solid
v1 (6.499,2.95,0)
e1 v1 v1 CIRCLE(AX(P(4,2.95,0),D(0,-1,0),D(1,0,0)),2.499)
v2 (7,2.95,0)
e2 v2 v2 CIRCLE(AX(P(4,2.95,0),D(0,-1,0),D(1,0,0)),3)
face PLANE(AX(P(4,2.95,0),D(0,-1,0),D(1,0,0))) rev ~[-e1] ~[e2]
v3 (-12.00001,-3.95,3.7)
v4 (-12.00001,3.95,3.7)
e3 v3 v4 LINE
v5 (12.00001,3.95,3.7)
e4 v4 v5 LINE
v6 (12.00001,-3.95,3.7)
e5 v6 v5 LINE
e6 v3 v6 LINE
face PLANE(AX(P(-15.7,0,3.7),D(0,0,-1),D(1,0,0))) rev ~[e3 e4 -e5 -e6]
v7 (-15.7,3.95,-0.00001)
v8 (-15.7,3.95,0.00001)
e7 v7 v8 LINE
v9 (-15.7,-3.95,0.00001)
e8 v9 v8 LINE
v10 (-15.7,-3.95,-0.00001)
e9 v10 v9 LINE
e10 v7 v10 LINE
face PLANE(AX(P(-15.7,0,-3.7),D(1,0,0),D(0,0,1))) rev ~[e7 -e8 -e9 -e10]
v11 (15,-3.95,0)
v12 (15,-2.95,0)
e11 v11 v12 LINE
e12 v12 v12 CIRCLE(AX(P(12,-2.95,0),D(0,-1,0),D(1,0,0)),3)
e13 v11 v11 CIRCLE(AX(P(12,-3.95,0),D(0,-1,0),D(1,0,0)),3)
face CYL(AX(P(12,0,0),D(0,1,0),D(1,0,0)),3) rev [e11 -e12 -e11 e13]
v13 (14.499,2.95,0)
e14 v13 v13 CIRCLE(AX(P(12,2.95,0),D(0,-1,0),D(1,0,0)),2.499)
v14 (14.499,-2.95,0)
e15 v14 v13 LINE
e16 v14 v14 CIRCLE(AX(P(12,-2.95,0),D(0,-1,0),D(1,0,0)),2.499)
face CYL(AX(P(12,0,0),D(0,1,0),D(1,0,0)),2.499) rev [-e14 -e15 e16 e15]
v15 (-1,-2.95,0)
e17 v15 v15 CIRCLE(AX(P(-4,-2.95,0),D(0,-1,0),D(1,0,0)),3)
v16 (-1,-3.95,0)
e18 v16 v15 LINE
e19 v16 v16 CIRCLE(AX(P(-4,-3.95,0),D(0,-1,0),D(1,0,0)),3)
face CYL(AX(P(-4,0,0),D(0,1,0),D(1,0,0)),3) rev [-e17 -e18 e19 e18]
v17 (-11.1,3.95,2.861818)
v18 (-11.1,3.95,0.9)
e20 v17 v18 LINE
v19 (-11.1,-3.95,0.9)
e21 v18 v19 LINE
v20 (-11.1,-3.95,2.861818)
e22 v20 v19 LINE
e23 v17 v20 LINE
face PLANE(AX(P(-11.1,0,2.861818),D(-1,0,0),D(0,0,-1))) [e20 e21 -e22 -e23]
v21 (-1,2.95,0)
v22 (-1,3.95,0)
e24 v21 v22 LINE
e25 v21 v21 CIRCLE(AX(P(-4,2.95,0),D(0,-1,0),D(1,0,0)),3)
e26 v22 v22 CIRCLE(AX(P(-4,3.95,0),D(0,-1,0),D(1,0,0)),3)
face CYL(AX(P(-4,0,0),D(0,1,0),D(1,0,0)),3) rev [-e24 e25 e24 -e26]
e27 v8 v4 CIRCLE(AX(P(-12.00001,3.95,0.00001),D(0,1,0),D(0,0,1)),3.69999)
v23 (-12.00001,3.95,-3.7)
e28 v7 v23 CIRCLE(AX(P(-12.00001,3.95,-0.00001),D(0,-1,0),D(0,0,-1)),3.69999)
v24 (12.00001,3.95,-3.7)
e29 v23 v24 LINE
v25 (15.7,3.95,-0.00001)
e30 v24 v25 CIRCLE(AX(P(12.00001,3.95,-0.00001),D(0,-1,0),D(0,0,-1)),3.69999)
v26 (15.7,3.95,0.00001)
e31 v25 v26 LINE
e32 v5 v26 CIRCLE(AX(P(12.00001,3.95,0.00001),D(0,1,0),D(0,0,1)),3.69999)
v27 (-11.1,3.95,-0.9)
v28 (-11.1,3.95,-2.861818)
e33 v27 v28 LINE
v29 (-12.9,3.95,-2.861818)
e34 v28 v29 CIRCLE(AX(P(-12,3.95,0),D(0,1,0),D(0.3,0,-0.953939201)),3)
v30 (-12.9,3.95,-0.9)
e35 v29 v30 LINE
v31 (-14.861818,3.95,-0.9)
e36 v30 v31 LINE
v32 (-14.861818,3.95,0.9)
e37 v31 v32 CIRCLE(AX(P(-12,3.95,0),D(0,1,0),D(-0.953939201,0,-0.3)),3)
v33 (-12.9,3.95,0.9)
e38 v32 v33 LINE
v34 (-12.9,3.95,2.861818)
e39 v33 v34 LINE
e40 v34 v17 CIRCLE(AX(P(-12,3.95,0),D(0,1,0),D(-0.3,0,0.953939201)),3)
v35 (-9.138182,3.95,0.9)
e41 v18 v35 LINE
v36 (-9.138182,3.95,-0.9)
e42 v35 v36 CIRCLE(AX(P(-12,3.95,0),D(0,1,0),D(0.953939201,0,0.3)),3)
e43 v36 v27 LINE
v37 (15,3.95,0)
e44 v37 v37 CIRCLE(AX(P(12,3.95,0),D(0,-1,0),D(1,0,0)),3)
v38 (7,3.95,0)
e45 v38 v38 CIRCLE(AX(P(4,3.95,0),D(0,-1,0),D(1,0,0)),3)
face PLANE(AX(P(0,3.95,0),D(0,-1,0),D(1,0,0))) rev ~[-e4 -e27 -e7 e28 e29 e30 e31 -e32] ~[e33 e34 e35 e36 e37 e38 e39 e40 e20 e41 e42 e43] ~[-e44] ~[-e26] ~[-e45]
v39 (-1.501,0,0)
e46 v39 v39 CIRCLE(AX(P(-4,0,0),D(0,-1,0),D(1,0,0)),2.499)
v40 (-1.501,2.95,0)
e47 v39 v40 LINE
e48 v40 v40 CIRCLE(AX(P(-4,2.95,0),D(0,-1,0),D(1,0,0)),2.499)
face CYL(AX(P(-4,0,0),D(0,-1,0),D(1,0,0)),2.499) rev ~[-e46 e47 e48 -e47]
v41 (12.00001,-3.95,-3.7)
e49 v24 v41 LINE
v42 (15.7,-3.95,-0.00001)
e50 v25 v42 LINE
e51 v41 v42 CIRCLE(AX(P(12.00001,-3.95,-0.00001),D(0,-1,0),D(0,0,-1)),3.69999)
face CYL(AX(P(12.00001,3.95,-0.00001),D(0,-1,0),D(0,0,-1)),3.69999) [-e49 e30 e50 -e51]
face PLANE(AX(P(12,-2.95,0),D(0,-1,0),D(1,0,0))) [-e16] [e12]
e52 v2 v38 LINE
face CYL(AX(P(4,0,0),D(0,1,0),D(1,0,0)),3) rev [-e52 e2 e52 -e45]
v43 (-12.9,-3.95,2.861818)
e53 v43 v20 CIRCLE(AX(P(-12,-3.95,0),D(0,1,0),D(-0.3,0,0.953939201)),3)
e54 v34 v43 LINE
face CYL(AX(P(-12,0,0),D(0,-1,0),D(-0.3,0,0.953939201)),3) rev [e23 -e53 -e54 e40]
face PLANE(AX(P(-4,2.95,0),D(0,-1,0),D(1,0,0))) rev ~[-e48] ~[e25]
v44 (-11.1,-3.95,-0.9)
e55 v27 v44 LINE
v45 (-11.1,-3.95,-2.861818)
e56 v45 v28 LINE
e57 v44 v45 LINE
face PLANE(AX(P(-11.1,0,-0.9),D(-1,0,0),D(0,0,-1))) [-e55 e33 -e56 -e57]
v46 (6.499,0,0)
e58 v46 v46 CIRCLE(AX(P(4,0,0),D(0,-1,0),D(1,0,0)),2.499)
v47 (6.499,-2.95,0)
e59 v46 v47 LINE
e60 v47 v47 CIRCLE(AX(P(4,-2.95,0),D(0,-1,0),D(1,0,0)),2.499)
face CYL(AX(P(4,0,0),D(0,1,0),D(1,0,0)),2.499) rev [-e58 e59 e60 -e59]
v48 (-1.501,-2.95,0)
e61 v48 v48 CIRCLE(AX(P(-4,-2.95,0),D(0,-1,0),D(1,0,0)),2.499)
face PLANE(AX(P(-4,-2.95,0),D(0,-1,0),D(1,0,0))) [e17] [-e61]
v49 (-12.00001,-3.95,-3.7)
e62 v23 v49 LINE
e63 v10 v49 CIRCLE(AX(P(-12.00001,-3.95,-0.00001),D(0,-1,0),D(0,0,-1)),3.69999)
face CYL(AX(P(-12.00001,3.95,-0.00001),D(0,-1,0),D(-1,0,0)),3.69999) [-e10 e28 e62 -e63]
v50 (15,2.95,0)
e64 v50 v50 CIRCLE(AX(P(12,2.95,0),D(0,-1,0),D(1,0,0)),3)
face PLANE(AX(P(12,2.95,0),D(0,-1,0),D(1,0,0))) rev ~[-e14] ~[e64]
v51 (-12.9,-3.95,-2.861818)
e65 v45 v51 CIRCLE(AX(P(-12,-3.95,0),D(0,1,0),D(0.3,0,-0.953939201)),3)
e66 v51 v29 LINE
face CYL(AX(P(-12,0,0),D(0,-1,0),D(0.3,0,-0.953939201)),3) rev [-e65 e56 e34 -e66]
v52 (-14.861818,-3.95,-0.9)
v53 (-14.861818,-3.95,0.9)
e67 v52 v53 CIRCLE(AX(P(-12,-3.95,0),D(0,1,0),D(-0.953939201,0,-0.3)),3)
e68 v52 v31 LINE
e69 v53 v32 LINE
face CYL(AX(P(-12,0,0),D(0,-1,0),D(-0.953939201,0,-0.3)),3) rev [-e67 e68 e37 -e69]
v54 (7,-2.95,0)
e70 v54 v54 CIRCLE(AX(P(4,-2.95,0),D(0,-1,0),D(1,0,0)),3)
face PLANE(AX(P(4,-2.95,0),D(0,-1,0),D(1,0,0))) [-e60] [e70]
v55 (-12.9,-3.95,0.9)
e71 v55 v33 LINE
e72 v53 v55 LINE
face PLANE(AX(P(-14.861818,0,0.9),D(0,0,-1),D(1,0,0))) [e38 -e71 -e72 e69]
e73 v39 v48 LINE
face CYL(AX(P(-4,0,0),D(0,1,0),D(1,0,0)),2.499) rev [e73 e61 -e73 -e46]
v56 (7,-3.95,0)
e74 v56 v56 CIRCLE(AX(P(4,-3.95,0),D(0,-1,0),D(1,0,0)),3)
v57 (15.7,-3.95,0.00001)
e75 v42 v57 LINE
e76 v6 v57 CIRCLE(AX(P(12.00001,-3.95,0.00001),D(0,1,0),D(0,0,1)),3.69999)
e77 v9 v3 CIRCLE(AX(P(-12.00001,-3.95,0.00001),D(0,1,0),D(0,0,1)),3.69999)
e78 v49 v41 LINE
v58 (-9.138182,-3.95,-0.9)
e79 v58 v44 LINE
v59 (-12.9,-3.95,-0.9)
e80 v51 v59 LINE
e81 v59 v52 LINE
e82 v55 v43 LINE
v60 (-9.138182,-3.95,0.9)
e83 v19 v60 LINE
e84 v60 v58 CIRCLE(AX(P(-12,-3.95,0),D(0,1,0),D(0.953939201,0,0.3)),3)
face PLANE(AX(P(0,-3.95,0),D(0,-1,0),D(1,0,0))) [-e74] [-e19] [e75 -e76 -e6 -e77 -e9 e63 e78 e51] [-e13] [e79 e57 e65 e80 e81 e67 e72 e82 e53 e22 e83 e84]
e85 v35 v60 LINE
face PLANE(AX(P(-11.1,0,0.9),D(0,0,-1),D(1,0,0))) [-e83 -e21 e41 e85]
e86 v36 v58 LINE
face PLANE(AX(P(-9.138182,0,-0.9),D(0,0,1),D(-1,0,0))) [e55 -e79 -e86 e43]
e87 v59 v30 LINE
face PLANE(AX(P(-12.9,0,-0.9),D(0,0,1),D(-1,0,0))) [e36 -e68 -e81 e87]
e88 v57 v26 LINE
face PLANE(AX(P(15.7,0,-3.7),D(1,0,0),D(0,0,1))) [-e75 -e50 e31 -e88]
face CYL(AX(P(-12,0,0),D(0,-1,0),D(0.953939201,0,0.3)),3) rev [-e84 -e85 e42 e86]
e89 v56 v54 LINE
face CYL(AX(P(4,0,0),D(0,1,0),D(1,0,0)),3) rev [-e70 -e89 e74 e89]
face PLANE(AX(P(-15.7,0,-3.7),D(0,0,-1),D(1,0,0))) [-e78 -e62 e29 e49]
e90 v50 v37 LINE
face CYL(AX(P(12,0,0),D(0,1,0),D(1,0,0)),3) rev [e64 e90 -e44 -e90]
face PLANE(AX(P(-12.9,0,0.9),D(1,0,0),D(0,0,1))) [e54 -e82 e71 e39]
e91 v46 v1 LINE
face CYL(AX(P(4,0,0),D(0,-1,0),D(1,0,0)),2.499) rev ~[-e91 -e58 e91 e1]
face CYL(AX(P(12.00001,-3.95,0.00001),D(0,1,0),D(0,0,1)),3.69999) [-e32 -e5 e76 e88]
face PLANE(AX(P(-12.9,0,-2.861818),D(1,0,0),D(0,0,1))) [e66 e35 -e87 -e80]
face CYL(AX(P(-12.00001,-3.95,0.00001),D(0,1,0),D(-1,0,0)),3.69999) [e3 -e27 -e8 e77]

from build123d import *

# Parameters (mm, degrees)
F0_W     = 31.4
F0_H     = 7.4
F0_R     = 3
F1_DEPTH = 3.95
F0_R_2   = 2.499
F2_DEPTH = 2.95
F3_R     = 3.69999


# Not quite as in the source:
# - a fillet or chamfer is up to 0.001 mm smaller than in the source, because OpenCascade refuses the exact size


with BuildPart() as f1:
    # F0 (on Front) → F1 (new body, symmetric)
    with BuildSketch(Plane.XZ):
        Rectangle(F0_W, F0_H)
        with BuildLine():
            ThreePointArc((-12.9, 2.8618176043), (-12, 3), (-11.1, 2.8618176043))
            Line((-11.1, 2.8618176043), (-11.1, 0.9))
            Line((-11.1, 0.9), (-9.1381823957, 0.9))
            ThreePointArc((-9.1381823957, 0.9), (-9, 0), (-9.1381823957, -0.9))
            Line((-9.1381823957, -0.9), (-11.1, -0.9))
            Line((-11.1, -0.9), (-11.1, -2.8618176043))
            ThreePointArc((-11.1, -2.8618176043), (-12, -3), (-12.9, -2.8618176043))
            Line((-12.9, -2.8618176043), (-12.9, -0.9))
            Line((-12.9, -0.9), (-14.8618176043, -0.9))
            ThreePointArc((-14.8618176043, -0.9), (-15, 0), (-14.8618176043, 0.9))
            Line((-14.8618176043, 0.9), (-12.9, 0.9))
            Line((-12.9, 0.9), (-12.9, 2.8618176043))
        make_face(mode=Mode.SUBTRACT)
        with Locations((-4, 0)):
            Circle(F0_R, mode=Mode.SUBTRACT)
        with Locations((4, 0)):
            Circle(F0_R, mode=Mode.SUBTRACT)
        with Locations((12, 0)):
            Circle(F0_R, mode=Mode.SUBTRACT)
    extrude(amount=F1_DEPTH, both=True)

    # F0 (on Front) → F2 (join, symmetric)
    with BuildSketch(Plane.XZ):
        with Locations((-4, 0)):
            Circle(F0_R)
        with Locations((-4, 0)):
            Circle(F0_R_2, mode=Mode.SUBTRACT)
        with Locations((4, 0)):
            Circle(F0_R)
        with Locations((4, 0)):
            Circle(F0_R_2, mode=Mode.SUBTRACT)
        with Locations((12, 0)):
            Circle(F0_R)
        with Locations((12, 0)):
            Circle(F0_R_2, mode=Mode.SUBTRACT)
    extrude(amount=F2_DEPTH, both=True)

    # F3 (radius 3.7 in the source; OpenCascade refuses exactly that, so slightly less here)
    f3_edges = [f1.edges().sort_by_distance(p)[0] for p in [
        (-15.7, 0, 3.7),
        (-15.7, 0, -3.7),
        (15.7, 0, 3.7),
        (15.7, 0, -3.7),
    ]]
    fillet(f3_edges, radius=F3_R)


solid = f1.part
